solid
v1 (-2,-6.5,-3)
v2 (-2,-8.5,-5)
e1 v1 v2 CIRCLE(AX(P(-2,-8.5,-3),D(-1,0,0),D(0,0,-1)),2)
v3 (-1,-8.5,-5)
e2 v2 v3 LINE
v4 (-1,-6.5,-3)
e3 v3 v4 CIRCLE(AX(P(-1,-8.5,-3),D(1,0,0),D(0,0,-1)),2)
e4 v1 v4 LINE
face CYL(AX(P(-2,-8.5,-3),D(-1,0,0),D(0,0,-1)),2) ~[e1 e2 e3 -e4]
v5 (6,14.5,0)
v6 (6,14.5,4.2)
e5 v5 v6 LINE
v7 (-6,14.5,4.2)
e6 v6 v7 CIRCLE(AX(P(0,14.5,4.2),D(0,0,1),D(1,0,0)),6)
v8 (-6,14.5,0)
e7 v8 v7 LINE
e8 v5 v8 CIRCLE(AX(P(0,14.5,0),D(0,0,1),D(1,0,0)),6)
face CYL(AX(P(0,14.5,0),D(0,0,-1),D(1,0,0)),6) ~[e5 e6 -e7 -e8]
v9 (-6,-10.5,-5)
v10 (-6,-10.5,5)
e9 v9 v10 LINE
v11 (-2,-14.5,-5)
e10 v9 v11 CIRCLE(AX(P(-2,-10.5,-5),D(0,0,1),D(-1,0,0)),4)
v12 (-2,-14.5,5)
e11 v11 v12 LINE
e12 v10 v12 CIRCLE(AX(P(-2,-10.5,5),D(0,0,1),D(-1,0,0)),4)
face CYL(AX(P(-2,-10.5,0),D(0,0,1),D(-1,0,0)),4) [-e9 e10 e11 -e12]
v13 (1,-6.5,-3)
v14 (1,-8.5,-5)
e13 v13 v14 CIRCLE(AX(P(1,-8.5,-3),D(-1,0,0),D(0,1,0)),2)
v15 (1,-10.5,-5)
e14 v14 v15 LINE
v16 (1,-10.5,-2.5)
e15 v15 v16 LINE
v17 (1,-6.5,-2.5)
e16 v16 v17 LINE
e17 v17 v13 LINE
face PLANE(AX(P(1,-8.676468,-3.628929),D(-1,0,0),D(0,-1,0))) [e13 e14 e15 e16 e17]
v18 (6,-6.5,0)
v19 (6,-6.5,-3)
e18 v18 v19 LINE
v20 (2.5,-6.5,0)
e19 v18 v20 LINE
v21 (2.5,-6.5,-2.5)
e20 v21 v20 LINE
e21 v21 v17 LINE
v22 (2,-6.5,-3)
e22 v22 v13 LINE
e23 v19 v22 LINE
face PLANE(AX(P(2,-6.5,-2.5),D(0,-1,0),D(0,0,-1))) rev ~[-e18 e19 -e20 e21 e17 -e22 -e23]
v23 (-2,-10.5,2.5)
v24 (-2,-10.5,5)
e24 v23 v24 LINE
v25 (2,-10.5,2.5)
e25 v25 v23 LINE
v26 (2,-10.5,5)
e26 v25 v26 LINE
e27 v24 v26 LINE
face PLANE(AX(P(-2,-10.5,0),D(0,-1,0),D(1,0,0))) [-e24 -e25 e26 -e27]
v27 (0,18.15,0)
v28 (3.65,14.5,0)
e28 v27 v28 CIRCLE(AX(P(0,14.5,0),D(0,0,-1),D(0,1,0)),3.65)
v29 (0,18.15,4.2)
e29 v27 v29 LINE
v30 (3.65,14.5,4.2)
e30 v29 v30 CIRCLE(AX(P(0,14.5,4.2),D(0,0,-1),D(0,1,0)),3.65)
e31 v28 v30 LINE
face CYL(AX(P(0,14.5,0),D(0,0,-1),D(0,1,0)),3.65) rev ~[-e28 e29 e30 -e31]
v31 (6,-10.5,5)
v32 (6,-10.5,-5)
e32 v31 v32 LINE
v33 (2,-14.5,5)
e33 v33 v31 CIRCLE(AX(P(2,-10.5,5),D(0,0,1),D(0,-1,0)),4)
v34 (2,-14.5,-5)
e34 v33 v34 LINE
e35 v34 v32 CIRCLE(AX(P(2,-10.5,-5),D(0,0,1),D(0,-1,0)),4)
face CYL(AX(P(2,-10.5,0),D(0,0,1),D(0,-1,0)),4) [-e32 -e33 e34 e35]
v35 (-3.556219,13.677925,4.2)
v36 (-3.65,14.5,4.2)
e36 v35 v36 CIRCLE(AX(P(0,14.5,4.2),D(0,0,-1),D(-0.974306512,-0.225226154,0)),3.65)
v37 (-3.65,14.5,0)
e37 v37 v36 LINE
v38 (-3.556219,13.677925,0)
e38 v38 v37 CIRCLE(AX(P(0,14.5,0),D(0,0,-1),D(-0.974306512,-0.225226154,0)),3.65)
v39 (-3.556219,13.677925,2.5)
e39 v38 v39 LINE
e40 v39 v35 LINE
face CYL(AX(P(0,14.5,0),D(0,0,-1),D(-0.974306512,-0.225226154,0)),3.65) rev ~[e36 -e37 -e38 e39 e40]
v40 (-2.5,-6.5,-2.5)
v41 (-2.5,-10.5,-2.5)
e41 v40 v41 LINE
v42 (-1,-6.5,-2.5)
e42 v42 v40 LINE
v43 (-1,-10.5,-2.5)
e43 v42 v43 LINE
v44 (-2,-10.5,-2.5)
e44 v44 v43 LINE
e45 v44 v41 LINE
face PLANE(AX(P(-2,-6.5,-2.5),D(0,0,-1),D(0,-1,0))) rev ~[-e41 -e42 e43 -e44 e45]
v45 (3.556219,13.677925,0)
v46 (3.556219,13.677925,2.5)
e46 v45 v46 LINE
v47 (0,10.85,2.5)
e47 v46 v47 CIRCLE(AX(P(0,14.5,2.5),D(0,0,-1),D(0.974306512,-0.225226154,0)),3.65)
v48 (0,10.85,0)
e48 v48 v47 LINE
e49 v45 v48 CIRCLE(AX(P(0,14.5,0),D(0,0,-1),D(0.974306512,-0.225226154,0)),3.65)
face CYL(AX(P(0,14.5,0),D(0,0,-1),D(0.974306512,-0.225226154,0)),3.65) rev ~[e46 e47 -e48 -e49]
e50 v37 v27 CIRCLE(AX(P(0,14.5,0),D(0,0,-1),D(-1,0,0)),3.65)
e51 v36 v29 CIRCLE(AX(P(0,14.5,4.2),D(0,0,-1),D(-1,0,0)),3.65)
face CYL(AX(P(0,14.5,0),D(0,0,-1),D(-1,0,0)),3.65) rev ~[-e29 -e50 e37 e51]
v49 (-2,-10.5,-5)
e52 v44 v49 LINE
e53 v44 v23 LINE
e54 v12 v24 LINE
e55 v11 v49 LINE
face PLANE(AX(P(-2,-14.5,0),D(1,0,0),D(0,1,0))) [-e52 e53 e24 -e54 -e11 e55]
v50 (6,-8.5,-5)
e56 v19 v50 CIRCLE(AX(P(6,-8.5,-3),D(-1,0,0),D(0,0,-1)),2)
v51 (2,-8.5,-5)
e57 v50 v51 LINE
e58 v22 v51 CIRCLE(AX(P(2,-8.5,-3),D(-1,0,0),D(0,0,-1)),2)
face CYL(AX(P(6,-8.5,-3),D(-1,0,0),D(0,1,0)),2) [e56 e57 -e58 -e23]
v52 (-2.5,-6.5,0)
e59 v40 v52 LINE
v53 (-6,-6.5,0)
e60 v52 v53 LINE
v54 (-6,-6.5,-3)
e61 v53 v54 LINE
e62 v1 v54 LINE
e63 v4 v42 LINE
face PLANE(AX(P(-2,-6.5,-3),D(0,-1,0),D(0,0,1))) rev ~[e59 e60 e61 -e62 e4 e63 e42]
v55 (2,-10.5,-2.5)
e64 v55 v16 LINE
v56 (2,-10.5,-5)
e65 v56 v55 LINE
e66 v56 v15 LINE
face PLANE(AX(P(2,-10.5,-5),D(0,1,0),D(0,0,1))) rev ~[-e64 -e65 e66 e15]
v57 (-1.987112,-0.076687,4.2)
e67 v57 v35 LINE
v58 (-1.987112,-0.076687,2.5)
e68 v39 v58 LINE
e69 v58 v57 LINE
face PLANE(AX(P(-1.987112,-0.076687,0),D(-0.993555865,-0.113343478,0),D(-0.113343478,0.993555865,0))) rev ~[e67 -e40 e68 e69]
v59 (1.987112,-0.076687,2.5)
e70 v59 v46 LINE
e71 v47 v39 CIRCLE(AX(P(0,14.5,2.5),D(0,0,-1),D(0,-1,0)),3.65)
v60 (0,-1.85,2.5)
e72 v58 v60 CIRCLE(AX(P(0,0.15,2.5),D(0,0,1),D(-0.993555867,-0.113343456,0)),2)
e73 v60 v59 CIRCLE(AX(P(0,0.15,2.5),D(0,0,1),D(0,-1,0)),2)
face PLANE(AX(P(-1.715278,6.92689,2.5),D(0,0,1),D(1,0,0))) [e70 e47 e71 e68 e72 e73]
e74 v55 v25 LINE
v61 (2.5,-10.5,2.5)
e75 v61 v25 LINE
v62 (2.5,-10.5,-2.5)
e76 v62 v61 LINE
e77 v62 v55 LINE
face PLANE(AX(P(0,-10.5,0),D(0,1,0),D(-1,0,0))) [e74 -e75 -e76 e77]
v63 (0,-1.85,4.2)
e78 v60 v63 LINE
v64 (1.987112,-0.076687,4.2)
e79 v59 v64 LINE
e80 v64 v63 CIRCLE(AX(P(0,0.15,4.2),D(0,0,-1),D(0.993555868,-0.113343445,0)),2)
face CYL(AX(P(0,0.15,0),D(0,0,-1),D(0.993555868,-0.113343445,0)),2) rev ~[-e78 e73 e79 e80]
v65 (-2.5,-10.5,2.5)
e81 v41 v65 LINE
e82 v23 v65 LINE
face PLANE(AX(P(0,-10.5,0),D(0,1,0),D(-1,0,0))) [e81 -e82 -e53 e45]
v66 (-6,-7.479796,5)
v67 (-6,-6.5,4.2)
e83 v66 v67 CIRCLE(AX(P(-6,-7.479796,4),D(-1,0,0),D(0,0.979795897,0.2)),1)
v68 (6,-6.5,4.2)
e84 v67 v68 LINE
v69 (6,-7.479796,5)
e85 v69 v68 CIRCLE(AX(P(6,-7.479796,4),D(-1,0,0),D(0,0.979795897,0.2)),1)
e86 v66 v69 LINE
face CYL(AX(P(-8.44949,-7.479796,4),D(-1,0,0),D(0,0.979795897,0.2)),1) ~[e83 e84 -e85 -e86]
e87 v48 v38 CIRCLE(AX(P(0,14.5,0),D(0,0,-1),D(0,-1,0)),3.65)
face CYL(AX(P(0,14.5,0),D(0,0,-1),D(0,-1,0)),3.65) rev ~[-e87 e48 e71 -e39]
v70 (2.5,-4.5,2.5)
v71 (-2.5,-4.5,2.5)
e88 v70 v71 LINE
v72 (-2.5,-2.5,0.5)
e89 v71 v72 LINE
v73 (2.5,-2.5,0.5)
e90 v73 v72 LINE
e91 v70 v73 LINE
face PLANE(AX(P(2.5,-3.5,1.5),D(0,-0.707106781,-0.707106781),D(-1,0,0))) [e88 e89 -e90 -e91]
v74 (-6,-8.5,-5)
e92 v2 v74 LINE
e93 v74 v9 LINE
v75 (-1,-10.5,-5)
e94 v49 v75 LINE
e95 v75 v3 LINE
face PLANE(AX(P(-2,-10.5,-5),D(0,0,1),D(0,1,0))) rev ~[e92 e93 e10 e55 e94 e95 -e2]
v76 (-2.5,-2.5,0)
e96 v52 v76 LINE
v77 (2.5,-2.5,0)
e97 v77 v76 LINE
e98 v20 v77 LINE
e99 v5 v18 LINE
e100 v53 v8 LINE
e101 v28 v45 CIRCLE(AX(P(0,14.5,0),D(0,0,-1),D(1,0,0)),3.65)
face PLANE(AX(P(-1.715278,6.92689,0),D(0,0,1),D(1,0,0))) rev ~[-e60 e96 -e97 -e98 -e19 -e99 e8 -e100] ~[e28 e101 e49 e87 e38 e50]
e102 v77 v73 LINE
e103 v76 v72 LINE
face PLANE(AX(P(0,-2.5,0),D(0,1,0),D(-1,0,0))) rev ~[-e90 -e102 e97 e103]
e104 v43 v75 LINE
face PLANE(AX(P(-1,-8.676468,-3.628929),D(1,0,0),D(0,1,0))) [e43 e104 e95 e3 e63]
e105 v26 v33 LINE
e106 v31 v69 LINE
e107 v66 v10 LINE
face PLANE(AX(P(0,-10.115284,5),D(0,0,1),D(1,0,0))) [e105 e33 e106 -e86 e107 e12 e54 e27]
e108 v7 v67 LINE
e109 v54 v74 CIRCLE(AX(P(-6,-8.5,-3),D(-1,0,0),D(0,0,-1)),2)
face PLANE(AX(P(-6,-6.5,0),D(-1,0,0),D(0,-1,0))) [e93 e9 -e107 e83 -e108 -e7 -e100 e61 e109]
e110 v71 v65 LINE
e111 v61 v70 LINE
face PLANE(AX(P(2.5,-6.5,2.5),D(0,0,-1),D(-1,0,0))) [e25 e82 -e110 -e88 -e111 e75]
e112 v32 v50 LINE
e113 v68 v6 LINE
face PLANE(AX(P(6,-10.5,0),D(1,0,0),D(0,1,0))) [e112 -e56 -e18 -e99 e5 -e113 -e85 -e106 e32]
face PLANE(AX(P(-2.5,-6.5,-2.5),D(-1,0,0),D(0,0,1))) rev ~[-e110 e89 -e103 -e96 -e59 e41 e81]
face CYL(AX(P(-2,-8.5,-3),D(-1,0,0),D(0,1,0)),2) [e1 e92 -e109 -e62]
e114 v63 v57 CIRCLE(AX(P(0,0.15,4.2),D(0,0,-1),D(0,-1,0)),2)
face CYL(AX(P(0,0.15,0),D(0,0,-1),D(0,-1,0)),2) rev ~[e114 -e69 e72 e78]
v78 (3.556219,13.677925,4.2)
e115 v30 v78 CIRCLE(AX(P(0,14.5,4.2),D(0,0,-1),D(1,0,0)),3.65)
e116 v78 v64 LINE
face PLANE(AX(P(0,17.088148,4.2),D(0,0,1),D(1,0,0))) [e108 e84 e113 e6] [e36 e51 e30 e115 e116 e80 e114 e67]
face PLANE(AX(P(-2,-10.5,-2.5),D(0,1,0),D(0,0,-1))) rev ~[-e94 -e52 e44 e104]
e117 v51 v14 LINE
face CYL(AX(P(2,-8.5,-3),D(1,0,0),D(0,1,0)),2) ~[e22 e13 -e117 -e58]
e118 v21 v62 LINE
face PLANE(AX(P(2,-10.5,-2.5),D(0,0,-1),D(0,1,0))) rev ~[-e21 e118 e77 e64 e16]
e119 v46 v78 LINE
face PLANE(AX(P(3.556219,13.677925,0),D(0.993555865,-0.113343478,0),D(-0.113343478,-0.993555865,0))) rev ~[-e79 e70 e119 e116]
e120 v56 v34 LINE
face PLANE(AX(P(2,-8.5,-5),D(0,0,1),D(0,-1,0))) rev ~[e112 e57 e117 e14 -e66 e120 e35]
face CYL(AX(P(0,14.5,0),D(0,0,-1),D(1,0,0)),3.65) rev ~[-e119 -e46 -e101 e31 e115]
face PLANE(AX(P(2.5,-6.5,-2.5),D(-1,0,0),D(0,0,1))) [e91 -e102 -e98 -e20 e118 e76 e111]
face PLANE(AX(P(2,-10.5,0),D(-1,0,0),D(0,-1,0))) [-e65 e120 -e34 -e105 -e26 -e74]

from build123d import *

# Parameters (mm, degrees)
F1_DEPTH      = 4.2
F2_DEPTH      = 2.5
F3_DEPTH      = 5
F3_DEPTH_BACK = 5
F4_W          = 5
F4_H          = 5
F5_DEPTH      = 4
F5_DEPTH_BACK = 4
F6_SIZE       = 2
F7_W          = 4
F7_H          = 2.5
F8_DEPTH      = 25
F9_R          = 2
F11_DEPTH     = 1
F13_DEPTH     = 1
F14_T1_DEPTH  = 16.8989794856


# Not quite as in the source:
# - a fillet or chamfer that OpenCascade refuses, or shapes differently, is made with other operations: its cross-section is extruded or revolved along the edge and cut away or added


with BuildPart() as f1:
    # F0 (on Top) → F1 (new body)
    with BuildSketch(Plane.XY):
        with BuildLine():
            ThreePointArc((6, 14.5), (0, 20.5), (-6, 14.5))
            Line((-6, 14.5), (-3.65, 14.5))
            ThreePointArc((-3.65, 14.5), (-2.5809397513, 17.0809397513), (0, 18.15))
            ThreePointArc((0, 18.15), (2.5809397513, 17.0809397513), (3.65, 14.5))
            Line((3.65, 14.5), (6, 14.5))
        make_face()
        with BuildLine():
            Line((6, -6.5), (-6, -6.5))
            Line((-6, -6.5), (-6, -10.5))
            ThreePointArc((-6, -10.5), (-4.8284271247, -13.3284271247), (-2, -14.5))
            Line((-2, -14.5), (-2, -10.5))
            Line((-2, -10.5), (0, -10.5))
            Line((0, -10.5), (2, -10.5))
            Line((2, -10.5), (2, -14.5))
            ThreePointArc((2, -14.5), (4.8284271247, -13.3284271247), (6, -10.5))
            Line((6, -10.5), (6, -6.5))
        make_face()
        with BuildLine():
            Line((-3.65, 14.5), (-6, 14.5))
            Line((-6, 14.5), (-6, -6.5))
            Line((-6, -6.5), (6, -6.5))
            Line((6, -6.5), (6, 14.5))
            Line((6, 14.5), (3.65, 14.5))
            ThreePointArc((3.65, 14.5), (3.6264789057, 14.0862963062), (3.5562187692, 13.6779245377))
            Line((3.5562187692, 13.6779245377), (1.9871117367, -0.0766868897))
            ThreePointArc((1.9871117367, -0.0766868897), (1.3316580306, -1.3422087286), (0, -1.85))
            ThreePointArc((0, -1.85), (-1.3316580225, -1.3422087358), (-1.9871117342, -0.0766869112))
            Line((-1.9871117342, -0.0766869112), (-3.5562187692, 13.6779245377))
            ThreePointArc((-3.5562187692, 13.6779245377), (-3.6264789057, 14.0862963062), (-3.65, 14.5))
        make_face()
    extrude(amount=F1_DEPTH)

    # F0 (on Top) → F2 (join)
    with BuildSketch(Plane.XY):
        with BuildLine():
            ThreePointArc((0, 10.85), (-2.2717751388, 11.6431594866), (-3.5562187692, 13.6779245377))
            Line((-3.5562187692, 13.6779245377), (-1.9871117342, -0.0766869112))
            ThreePointArc((-1.9871117342, -0.0766869112), (-1.4922087358, 1.4816580225), (0, 2.15))
            Line((0, 2.15), (0, 10.85))
        make_face()
        with BuildLine():
            ThreePointArc((3.5562187692, 13.6779245377), (2.2717751388, 11.6431594866), (0, 10.85))
            Line((0, 10.85), (0, 2.15))
            ThreePointArc((0, 2.15), (1.4142135624, 1.5642135624), (2, 0.15))
            ThreePointArc((2, 0.15), (1.9967753346, 0.0364735127), (1.9871117367, -0.0766868897))
            Line((1.9871117367, -0.0766868897), (3.5562187692, 13.6779245377))
        make_face()
        with BuildLine():
            ThreePointArc((0, 2.15), (-1.4922087358, 1.4816580225), (-1.9871117342, -0.0766869112))
            ThreePointArc((-1.9871117342, -0.0766869112), (-1.3316580225, -1.3422087358), (0, -1.85))
            Line((0, -1.85), (0, 2.15))
        make_face()
        with BuildLine():
            ThreePointArc((2, 0.15), (1.4142135624, 1.5642135624), (0, 2.15))
            Line((0, 2.15), (0, -1.85))
            ThreePointArc((0, -1.85), (1.3316580306, -1.3422087286), (1.9871117367, -0.0766868897))
            ThreePointArc((1.9871117367, -0.0766868897), (1.9967753346, 0.0364735127), (2, 0.15))
        make_face()
    extrude(amount=F2_DEPTH)

    # F0 (on Top) → F3 (join, two sides)
    with BuildSketch(Plane.XY) as f3_sk:
        with BuildLine():
            Line((6, -6.5), (-6, -6.5))
            Line((-6, -6.5), (-6, -10.5))
            ThreePointArc((-6, -10.5), (-4.8284271247, -13.3284271247), (-2, -14.5))
            Line((-2, -14.5), (-2, -10.5))
            Line((-2, -10.5), (0, -10.5))
            Line((0, -10.5), (2, -10.5))
            Line((2, -10.5), (2, -14.5))
            ThreePointArc((2, -14.5), (4.8284271247, -13.3284271247), (6, -10.5))
            Line((6, -10.5), (6, -6.5))
        make_face()
    extrude(amount=F3_DEPTH)
    extrude(f3_sk.sketch, amount=-F3_DEPTH_BACK)

    # F4 (on face) → F5 (cut, two sides)
    with BuildSketch(Plane(origin=(0, -6.5, 0), x_dir=(-1, 0, 0), z_dir=(0, 1, 0))) as f5_sk:
        Rectangle(F4_W, F4_H)
    extrude(amount=-F5_DEPTH, mode=Mode.SUBTRACT)
    extrude(f5_sk.sketch, amount=F5_DEPTH_BACK, mode=Mode.SUBTRACT)

    # F6
    f6_edges = [f1.edges().sort_by_distance(p)[0] for p in [
        (0, -2.5, 2.5),
    ]]
    chamfer(f6_edges, length=F6_SIZE)

    # F7 (on face) → F8 (cut)
    with BuildSketch(Plane.XZ.offset(10.5)):
        with Locations((0, -3.75)):
            Rectangle(F7_W, F7_H)
    extrude(amount=-F8_DEPTH, mode=Mode.SUBTRACT)

    # F9
    f9_edges = [f1.edges().sort_by_distance(p)[0] for p in [
        (4, -6.5, -5),
        (-4, -6.5, -5),
    ]]
    fillet(f9_edges, radius=F9_R)

    # F10 (on face) → F11 (join)
    with BuildSketch(Plane.YZ.offset(-2)):
        with BuildLine():
            Line((-6.5, -2.5), (-10.5, -2.5))
            Line((-10.5, -2.5), (-10.5, -5))
            Line((-10.5, -5), (-8.5, -5))
            ThreePointArc((-8.5, -5), (-7.0857864376, -4.4142135624), (-6.5, -3))
            Line((-6.5, -3), (-6.5, -2.5))
        make_face()
    extrude(amount=F11_DEPTH)

    # F12 (on face) → F13 (join)
    with BuildSketch(Plane(origin=(2, 0, 0), x_dir=(0, -1, 0), z_dir=(-1, 0, 0))):
        with BuildLine():
            Line((10.5, -5), (10.5, -2.5))
            Line((10.5, -2.5), (6.5, -2.5))
            Line((6.5, -2.5), (6.5, -3))
            ThreePointArc((6.5, -3), (7.0857864376, -4.4142135624), (8.5, -5))
            Line((8.5, -5), (10.5, -5))
        make_face()
    extrude(amount=F13_DEPTH)

    # F14: fillet of radius 1 on 1 edges, made by hand

    # F14_s2 → F14_t1 (cut)
    with BuildSketch(Plane.YZ.offset(-8.4494897428)):
        with BuildLine():
            ThreePointArc((-6.5, 4.2), (-6.8473403651, 4.7745966692), (-7.4797958971, 5))
            Line((-7.4797958971, 5), (-6.5, 5))
            Line((-6.5, 5), (-6.5, 4.2))
        make_face()
    extrude(amount=F14_T1_DEPTH, mode=Mode.SUBTRACT)


solid = f1.part
